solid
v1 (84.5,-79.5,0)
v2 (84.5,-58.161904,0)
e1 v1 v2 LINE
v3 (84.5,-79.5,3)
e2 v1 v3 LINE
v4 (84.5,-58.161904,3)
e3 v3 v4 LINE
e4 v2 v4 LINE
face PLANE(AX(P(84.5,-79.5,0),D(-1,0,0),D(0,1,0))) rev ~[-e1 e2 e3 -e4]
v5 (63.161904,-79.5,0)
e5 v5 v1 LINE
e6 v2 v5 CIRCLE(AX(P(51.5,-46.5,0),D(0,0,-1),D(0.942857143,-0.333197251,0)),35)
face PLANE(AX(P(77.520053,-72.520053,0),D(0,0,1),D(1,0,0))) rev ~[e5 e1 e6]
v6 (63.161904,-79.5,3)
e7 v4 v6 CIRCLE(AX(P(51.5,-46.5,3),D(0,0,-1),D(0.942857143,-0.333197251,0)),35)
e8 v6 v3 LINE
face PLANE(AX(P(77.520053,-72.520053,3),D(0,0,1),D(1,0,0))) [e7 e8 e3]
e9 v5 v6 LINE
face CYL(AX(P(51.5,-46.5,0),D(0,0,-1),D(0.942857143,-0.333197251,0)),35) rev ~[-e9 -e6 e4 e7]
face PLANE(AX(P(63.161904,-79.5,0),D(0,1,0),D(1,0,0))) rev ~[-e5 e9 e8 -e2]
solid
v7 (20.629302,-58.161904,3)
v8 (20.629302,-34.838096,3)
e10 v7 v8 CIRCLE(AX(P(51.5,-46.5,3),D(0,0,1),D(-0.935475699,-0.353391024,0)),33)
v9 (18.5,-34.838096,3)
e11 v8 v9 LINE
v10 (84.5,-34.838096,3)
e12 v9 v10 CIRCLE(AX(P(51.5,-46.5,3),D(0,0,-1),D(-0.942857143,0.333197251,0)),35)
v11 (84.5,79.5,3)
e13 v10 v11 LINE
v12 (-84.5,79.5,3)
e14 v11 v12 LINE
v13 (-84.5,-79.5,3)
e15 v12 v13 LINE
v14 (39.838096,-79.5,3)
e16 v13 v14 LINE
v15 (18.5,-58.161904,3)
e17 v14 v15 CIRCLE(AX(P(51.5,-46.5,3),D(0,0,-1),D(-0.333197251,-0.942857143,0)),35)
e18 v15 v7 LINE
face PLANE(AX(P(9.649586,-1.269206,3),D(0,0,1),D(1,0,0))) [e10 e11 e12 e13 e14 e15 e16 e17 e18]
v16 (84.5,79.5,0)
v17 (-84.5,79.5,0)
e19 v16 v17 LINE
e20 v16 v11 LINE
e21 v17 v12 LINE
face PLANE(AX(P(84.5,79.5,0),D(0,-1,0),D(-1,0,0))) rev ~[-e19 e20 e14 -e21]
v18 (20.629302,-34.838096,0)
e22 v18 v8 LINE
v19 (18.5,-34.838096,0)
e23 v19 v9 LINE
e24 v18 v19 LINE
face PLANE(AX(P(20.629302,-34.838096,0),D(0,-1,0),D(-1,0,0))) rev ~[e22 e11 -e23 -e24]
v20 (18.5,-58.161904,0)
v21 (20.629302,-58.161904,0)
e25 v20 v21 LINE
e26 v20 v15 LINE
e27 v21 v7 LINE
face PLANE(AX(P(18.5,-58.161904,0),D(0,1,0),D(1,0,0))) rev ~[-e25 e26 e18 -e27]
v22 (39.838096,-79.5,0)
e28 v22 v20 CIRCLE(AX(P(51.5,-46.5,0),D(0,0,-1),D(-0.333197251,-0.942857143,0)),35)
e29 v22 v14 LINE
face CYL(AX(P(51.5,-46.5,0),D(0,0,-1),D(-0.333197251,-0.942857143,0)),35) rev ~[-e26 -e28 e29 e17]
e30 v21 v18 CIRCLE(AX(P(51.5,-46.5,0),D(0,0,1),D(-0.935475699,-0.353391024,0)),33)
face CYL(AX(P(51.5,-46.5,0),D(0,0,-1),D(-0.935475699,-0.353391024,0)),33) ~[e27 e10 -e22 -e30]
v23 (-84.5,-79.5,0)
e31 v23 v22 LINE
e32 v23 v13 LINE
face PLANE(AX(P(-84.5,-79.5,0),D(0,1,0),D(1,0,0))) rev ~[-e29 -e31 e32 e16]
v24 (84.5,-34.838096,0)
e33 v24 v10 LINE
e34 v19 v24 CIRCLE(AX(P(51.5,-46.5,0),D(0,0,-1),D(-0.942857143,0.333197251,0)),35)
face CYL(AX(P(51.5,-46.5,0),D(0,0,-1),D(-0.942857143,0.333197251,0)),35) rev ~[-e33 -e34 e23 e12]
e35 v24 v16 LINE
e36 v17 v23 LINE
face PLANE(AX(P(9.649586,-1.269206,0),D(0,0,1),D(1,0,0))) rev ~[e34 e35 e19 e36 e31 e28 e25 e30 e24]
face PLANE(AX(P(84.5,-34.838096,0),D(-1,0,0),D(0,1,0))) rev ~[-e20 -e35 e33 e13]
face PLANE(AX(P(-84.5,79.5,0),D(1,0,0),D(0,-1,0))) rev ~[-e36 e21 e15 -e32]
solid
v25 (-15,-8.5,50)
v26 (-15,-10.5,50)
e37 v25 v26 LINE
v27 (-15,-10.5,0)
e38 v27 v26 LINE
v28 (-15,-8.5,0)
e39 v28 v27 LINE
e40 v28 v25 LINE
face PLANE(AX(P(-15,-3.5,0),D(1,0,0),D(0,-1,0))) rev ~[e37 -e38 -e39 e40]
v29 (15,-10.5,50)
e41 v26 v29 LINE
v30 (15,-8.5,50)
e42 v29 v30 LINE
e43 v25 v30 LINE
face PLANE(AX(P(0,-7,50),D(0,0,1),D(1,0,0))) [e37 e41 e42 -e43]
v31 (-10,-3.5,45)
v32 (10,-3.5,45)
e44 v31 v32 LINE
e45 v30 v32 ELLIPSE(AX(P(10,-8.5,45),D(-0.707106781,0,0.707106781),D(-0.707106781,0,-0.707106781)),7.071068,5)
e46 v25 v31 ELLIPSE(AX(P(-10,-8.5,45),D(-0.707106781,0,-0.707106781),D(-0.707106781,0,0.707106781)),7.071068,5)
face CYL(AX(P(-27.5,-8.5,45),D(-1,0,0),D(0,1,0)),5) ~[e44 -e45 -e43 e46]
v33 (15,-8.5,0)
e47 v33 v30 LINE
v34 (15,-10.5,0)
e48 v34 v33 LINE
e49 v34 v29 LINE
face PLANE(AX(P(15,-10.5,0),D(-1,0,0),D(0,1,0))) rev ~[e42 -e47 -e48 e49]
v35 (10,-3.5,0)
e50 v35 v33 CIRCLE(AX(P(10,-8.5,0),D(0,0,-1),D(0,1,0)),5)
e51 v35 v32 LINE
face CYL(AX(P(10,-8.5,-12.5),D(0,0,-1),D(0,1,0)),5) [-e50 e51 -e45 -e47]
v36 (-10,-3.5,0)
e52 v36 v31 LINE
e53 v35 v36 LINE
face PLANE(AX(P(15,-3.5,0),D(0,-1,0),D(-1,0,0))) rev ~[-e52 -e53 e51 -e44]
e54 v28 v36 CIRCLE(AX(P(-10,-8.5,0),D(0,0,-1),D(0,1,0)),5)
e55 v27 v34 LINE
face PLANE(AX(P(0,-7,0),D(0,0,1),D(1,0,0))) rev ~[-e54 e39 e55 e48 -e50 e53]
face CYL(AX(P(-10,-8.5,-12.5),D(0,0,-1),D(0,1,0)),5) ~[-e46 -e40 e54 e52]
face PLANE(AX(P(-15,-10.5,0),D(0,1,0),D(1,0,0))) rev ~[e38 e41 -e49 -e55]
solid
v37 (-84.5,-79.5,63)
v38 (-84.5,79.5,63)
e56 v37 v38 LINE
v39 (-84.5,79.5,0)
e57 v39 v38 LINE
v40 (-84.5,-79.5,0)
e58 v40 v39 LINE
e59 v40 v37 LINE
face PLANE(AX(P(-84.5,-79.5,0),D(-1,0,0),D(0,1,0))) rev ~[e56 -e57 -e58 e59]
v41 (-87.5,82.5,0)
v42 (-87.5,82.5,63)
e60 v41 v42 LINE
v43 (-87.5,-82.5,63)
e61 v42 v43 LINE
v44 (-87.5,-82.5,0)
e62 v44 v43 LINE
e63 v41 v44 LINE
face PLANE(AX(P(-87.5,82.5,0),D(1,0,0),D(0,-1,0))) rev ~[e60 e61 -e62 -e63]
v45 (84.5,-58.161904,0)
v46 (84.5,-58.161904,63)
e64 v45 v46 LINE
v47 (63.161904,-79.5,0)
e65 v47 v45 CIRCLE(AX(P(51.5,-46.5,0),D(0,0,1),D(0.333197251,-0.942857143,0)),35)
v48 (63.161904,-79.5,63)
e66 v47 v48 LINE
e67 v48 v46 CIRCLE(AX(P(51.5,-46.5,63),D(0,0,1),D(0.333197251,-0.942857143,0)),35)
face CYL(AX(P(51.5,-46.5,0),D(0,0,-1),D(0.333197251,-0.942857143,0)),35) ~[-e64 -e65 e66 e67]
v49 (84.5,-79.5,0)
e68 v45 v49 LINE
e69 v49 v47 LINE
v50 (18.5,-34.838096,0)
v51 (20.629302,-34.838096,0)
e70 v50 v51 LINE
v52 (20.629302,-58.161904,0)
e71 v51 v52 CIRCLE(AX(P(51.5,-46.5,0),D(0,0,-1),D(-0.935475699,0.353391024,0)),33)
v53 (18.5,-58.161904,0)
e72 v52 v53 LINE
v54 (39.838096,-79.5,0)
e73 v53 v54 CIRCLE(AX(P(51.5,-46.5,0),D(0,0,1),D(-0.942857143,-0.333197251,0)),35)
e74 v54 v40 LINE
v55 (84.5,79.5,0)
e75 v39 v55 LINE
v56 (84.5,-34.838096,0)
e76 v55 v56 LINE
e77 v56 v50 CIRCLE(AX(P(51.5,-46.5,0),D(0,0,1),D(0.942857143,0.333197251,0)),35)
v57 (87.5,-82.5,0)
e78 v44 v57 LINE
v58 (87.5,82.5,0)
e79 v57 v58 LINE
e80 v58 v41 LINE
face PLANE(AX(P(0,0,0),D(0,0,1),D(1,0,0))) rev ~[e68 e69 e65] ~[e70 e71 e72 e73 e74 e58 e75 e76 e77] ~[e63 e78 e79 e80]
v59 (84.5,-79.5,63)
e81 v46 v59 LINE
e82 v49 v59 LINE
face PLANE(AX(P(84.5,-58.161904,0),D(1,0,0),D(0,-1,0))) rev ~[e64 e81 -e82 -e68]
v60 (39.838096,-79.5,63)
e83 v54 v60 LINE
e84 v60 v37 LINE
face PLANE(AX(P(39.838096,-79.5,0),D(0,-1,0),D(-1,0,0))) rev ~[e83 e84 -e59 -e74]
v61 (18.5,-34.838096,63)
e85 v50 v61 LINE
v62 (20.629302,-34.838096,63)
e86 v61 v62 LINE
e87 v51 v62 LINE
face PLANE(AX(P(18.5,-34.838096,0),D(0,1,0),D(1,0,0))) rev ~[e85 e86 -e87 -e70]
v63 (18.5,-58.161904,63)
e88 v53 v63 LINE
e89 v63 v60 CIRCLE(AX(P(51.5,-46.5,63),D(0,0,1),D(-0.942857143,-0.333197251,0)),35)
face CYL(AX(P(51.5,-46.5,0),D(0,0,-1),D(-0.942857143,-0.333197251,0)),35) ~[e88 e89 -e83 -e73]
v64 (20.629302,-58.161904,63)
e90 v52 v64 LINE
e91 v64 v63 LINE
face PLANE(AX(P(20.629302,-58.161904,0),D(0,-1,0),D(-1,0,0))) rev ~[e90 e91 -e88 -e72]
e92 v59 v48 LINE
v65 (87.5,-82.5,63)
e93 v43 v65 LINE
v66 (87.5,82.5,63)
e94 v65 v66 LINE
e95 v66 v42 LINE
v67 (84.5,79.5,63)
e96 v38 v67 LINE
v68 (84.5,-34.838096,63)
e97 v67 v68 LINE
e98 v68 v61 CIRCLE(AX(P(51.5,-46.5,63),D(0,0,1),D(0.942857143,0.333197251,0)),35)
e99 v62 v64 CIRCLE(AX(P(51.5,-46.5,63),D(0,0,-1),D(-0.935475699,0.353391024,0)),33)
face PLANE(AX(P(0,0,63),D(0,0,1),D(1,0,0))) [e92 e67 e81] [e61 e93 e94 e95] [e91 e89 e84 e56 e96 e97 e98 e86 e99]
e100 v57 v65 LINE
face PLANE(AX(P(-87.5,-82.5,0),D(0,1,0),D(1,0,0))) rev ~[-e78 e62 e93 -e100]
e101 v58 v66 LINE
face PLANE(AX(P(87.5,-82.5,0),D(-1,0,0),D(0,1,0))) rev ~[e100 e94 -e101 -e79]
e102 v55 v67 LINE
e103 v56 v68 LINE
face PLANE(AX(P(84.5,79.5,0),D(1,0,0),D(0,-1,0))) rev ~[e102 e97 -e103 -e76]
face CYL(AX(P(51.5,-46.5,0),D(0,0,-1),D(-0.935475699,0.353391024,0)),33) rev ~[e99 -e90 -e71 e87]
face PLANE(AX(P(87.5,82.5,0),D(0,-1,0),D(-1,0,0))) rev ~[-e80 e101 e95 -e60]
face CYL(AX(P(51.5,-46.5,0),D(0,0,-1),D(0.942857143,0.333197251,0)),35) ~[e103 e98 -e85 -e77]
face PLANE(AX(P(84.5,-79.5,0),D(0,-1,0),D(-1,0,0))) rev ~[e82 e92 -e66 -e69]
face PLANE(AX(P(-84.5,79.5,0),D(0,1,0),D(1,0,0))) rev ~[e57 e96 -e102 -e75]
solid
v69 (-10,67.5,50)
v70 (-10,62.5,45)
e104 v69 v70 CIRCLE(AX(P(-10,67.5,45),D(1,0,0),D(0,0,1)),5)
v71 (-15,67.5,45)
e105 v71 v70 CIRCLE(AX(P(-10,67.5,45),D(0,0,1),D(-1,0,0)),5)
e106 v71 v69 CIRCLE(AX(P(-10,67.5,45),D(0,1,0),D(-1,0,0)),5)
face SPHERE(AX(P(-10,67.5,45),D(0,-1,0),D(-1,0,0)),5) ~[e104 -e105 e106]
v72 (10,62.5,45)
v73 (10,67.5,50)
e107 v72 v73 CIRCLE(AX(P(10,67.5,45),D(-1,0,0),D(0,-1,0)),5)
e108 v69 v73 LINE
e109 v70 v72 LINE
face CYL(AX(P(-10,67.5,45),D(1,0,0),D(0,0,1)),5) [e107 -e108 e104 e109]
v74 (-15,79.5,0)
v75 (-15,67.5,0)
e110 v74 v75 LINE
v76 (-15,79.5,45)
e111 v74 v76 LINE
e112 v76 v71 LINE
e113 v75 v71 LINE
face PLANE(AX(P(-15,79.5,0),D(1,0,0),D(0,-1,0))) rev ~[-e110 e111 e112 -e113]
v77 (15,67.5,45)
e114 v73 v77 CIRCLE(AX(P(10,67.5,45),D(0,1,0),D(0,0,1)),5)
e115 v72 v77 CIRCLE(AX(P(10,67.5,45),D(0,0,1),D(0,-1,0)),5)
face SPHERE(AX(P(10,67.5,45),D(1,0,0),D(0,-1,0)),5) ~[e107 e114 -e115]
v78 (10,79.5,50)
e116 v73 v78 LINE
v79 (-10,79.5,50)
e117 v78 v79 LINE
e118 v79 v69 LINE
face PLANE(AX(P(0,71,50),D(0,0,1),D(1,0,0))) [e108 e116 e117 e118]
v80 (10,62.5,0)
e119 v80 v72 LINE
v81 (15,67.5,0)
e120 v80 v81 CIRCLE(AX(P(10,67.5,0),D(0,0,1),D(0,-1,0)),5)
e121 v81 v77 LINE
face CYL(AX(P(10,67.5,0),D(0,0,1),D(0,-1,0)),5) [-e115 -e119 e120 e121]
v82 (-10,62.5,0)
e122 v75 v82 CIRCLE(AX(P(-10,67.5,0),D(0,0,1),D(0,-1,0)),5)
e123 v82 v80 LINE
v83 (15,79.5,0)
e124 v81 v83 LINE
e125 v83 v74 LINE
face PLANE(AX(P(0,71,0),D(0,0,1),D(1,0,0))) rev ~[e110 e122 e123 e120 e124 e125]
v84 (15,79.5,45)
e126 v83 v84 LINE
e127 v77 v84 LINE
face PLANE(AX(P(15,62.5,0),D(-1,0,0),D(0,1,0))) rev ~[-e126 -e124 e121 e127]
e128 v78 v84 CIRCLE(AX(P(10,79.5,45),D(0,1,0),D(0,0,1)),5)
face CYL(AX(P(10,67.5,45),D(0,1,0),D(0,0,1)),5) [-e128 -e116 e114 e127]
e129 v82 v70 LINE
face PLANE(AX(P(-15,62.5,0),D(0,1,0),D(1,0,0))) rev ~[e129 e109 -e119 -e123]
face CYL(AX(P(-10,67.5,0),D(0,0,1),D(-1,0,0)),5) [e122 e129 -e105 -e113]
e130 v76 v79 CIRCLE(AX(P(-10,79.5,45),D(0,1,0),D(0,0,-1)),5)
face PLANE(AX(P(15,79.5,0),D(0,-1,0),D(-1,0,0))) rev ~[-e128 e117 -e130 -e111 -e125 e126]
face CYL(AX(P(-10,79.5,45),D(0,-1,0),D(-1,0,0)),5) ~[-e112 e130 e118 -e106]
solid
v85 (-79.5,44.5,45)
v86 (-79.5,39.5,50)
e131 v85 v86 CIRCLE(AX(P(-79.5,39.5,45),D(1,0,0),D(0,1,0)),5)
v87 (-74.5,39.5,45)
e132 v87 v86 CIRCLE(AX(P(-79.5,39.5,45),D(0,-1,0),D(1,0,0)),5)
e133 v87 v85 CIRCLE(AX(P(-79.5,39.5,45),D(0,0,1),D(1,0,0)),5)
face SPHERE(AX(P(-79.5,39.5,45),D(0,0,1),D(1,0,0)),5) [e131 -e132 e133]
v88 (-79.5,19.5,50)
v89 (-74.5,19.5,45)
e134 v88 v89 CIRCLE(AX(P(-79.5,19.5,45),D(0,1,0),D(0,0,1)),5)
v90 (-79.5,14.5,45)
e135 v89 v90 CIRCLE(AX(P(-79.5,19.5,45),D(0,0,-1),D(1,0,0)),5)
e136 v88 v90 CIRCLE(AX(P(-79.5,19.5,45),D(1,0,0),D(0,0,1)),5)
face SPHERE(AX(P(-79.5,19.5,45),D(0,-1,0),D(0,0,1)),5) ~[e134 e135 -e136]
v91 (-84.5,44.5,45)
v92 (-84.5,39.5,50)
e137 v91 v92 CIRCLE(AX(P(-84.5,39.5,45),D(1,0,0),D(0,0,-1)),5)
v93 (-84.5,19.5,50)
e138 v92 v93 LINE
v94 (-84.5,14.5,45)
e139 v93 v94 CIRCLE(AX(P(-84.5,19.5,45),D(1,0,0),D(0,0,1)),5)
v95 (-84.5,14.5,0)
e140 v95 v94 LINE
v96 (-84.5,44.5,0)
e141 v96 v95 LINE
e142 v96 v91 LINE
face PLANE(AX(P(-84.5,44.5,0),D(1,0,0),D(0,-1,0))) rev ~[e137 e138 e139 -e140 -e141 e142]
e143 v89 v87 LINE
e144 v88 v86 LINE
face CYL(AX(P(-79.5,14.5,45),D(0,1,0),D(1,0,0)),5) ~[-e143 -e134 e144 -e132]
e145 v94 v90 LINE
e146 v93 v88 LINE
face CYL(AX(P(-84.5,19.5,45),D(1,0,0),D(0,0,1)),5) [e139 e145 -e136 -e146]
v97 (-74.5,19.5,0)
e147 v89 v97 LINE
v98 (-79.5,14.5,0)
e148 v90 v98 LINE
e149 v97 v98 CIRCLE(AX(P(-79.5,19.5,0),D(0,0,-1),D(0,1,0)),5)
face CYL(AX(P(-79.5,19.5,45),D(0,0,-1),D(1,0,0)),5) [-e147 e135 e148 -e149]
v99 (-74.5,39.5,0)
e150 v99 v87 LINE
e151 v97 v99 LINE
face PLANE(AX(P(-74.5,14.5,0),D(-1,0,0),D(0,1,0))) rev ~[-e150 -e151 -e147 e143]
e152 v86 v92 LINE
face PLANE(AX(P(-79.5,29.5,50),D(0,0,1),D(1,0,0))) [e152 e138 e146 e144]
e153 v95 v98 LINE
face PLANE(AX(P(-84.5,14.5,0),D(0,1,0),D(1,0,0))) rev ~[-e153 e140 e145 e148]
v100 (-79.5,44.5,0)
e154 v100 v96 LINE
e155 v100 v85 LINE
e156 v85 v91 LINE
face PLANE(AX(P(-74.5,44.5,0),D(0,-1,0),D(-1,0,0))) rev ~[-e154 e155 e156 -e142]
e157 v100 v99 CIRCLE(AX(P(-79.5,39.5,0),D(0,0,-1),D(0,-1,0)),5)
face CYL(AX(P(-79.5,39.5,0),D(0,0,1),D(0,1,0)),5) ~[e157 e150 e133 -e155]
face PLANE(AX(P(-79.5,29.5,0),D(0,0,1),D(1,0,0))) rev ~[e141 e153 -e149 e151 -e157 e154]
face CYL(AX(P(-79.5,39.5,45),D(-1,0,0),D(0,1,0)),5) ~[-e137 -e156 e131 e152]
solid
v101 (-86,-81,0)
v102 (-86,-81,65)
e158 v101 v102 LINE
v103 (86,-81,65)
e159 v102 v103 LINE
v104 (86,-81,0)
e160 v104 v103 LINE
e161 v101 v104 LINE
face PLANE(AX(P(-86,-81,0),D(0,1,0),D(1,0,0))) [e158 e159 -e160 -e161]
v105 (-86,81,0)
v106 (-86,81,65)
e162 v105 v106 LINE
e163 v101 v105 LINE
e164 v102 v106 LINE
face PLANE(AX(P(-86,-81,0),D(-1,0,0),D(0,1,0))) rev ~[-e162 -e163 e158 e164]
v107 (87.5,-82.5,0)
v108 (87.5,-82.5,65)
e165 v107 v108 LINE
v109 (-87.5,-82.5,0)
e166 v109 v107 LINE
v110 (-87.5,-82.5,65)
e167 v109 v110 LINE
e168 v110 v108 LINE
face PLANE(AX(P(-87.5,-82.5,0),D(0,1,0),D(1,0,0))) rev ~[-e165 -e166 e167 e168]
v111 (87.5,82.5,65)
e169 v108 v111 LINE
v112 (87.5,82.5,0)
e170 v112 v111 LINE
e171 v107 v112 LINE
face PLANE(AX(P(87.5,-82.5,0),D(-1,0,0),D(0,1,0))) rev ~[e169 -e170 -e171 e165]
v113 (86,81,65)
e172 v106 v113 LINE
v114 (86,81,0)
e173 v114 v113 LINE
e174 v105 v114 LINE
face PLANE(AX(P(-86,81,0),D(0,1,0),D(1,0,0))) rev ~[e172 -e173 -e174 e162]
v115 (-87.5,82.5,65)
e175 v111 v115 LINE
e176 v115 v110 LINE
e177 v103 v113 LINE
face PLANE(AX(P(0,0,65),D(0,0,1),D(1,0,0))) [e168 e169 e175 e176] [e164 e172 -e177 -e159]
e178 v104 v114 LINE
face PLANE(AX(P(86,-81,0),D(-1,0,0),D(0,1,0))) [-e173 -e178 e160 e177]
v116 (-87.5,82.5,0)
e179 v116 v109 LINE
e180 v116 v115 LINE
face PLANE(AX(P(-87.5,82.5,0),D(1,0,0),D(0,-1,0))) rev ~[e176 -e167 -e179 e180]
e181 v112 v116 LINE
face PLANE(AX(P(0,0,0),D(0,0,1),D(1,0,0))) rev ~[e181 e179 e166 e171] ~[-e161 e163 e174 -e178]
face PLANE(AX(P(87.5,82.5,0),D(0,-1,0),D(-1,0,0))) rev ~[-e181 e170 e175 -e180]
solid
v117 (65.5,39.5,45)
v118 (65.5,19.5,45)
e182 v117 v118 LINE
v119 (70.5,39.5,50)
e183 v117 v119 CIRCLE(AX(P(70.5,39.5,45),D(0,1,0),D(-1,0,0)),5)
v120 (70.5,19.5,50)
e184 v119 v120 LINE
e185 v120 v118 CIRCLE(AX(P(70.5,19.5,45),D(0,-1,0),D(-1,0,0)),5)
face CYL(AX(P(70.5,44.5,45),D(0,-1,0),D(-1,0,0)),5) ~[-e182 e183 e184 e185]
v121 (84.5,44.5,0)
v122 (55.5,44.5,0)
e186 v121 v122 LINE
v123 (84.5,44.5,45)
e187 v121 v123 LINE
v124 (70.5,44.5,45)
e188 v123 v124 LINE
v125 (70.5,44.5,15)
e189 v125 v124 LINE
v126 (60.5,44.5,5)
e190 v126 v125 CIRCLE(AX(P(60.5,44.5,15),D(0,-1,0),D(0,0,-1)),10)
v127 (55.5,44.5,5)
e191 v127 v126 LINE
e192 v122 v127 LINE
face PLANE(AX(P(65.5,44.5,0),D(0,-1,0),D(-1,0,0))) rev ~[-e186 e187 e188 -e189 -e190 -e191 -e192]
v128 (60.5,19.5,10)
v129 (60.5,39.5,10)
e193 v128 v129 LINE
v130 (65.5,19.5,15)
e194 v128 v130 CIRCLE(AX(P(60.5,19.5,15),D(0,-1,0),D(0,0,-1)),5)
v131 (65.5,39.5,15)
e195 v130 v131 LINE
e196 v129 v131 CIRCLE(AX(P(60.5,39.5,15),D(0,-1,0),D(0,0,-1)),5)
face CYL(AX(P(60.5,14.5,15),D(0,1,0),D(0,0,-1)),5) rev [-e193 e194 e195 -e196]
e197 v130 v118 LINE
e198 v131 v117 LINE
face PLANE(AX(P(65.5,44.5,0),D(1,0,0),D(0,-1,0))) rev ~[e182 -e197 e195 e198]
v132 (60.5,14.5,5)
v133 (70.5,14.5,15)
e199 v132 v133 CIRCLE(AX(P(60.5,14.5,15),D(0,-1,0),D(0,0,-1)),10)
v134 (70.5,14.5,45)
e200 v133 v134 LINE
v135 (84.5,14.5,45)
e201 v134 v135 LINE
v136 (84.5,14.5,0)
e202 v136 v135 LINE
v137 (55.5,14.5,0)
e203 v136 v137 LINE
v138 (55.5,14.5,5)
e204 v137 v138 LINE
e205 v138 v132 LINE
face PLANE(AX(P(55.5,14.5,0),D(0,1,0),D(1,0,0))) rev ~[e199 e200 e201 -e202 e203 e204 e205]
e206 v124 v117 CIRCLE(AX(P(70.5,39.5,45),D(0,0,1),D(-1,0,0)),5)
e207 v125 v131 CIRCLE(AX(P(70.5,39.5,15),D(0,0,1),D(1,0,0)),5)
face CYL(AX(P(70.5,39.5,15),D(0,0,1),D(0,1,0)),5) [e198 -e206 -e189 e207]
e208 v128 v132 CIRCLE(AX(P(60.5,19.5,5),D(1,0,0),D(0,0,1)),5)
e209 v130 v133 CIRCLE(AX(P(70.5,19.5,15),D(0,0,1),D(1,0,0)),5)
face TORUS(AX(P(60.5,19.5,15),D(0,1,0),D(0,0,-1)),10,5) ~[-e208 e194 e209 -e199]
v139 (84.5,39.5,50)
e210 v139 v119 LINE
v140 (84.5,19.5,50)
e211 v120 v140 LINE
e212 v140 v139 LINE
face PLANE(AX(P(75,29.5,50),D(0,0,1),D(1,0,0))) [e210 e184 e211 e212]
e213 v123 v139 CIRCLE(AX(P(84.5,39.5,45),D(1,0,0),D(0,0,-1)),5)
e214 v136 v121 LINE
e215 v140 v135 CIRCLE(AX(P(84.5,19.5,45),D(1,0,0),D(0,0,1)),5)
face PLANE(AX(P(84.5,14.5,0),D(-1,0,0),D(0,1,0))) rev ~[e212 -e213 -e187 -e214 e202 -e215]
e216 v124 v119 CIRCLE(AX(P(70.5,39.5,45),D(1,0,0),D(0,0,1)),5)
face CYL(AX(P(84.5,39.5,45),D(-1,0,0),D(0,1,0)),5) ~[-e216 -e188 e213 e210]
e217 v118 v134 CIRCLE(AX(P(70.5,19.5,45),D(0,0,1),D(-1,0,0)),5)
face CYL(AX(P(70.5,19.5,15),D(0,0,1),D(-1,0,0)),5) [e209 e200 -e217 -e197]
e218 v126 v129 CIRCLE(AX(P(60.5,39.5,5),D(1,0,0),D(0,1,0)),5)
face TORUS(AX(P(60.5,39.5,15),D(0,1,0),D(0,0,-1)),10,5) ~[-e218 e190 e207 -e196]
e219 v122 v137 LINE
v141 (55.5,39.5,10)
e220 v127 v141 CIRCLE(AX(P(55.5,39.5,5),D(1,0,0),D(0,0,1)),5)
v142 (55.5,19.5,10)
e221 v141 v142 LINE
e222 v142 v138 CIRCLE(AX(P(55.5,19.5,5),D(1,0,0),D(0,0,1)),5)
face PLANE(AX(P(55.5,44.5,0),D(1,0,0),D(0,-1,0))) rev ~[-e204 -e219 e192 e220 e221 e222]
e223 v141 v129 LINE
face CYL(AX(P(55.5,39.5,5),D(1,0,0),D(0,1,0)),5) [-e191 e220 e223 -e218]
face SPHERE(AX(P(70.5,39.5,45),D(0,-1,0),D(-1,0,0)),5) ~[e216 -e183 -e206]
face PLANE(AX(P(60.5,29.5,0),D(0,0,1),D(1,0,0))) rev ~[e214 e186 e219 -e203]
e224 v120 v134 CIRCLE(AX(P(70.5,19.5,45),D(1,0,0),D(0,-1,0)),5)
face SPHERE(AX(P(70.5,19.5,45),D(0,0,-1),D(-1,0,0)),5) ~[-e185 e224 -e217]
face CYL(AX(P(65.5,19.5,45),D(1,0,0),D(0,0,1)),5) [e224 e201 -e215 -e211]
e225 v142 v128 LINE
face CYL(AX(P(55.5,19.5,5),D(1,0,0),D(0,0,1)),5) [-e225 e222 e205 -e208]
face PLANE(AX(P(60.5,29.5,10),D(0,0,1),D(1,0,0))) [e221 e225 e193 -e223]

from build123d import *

# Parameters (mm, degrees)
F0_W          = 172
F0_H          = 162
F1_DEPTH      = 63
F2_DEPTH      = 3
F3_DEPTH      = 50
F4_DEPTH      = 10
F5_F1_R       = 5
F5_F2_R       = 5
F5_2_F1_R     = 5
F5_2_F2_R     = 5
F5_2_F3_R     = 5
F5_3_T1_DEPTH = 55
F5_3_T3_DEPTH = 75
F5_4_F1_R     = 5
F5_4_F2_R     = 5
F5_4_F3_R     = 5
F6_DEPTH      = 65


# Not quite as in the source:
# - a fillet or chamfer that OpenCascade refuses, or shapes differently, is made with other operations: its cross-section is extruded or revolved along the edge and cut away or added


with BuildPart() as f1:
    # F0 (on Top) → F1 (new body)
    with BuildSketch(Plane.XY):
        Polygon((-87.5, -82.5), (87.5, -82.5), (87.5, -81), (87.5, 82.5), (0, 82.5), (-87.5, 82.5), align=None)
        Rectangle(F0_W, F0_H, mode=Mode.SUBTRACT)
        Rectangle(F0_W, F0_H)
        with BuildLine():
            Line((84.5, -58.1619037897), (84.5, -79.5))
            Line((84.5, -79.5), (63.1619037897, -79.5))
            ThreePointArc((63.1619037897, -79.5), (76.2487373415, -71.2487373415), (84.5, -58.1619037897))
        make_face(mode=Mode.SUBTRACT)
        with BuildLine():
            Line((-84.5, 44.5), (-84.5, 79.5))
            Line((-84.5, 79.5), (-15, 79.5))
            Line((-15, 79.5), (15, 79.5))
            Line((15, 79.5), (84.5, 79.5))
            Line((84.5, 79.5), (84.5, 44.5))
            Line((84.5, 44.5), (84.5, 14.5))
            Line((84.5, 14.5), (84.5, -34.8380962103))
            ThreePointArc((84.5, -34.8380962103), (51.5, -11.5), (18.5, -34.8380962103))
            Line((18.5, -34.8380962103), (20.6293019191, -34.8380962103))
            ThreePointArc((20.6293019191, -34.8380962103), (84.5, -46.5), (20.6293019191, -58.1619037897))
            Line((20.6293019191, -58.1619037897), (18.5, -58.1619037897))
            ThreePointArc((18.5, -58.1619037897), (26.7512626585, -71.2487373415), (39.8380962103, -79.5))
            Line((39.8380962103, -79.5), (-84.5, -79.5))
            Line((-84.5, -79.5), (-84.5, 14.5))
            Line((-84.5, 14.5), (-84.5, 44.5))
        make_face(mode=Mode.SUBTRACT)
    extrude(amount=F1_DEPTH)


with BuildPart() as f2:
    # F0 (on Top) → F2 (new body)
    with BuildSketch(Plane.XY):
        with BuildLine():
            Line((-15, 79.5), (-84.5, 79.5))
            Line((-84.5, 79.5), (-84.5, 44.5))
            Line((-84.5, 44.5), (-74.5, 44.5))
            Line((-74.5, 44.5), (-74.5, 29.5))
            Line((-74.5, 29.5), (-74.5, 14.5))
            Line((-74.5, 14.5), (-84.5, 14.5))
            Line((-84.5, 14.5), (-84.5, -79.5))
            Line((-84.5, -79.5), (39.8380962103, -79.5))
            ThreePointArc((39.8380962103, -79.5), (26.7512626585, -71.2487373415), (18.5, -58.1619037897))
            Line((18.5, -58.1619037897), (20.6293019191, -58.1619037897))
            ThreePointArc((20.6293019191, -58.1619037897), (84.5, -46.5), (20.6293019191, -34.8380962103))
            Line((20.6293019191, -34.8380962103), (18.5, -34.8380962103))
            ThreePointArc((18.5, -34.8380962103), (51.5, -11.5), (84.5, -34.8380962103))
            Line((84.5, -34.8380962103), (84.5, 14.5))
            Line((84.5, 14.5), (65.5, 14.5))
            Line((65.5, 14.5), (55.5, 14.5))
            Line((55.5, 14.5), (55.5, 44.5))
            Line((55.5, 44.5), (65.5, 44.5))
            Line((65.5, 44.5), (84.5, 44.5))
            Line((84.5, 44.5), (84.5, 79.5))
            Line((84.5, 79.5), (15, 79.5))
            Line((15, 79.5), (15, 62.5))
            Line((15, 62.5), (0, 62.5))
            Line((0, 62.5), (-15, 62.5))
            Line((-15, 62.5), (-15, 79.5))
        make_face()
        Polygon((-15, -3.5), (0, -3.5), (15, -3.5), (15, -10.5), (-15, -10.5), align=None, mode=Mode.SUBTRACT)
        Polygon((-74.5, 44.5), (-84.5, 44.5), (-84.5, 14.5), (-74.5, 14.5), (-74.5, 29.5), align=None)
        Polygon((15, 79.5), (-15, 79.5), (-15, 62.5), (0, 62.5), (15, 62.5), align=None)
        Polygon((65.5, 29.5), (65.5, 44.5), (55.5, 44.5), (55.5, 14.5), (65.5, 14.5), align=None)
        Polygon((84.5, 14.5), (84.5, 44.5), (65.5, 44.5), (65.5, 29.5), (65.5, 14.5), align=None)
        Polygon((15, -3.5), (0, -3.5), (-15, -3.5), (-15, -10.5), (15, -10.5), align=None)
    extrude(amount=F2_DEPTH)


with BuildPart() as f2b:
    # F0 (on Top) → F2, piece 2 (new body)
    with BuildSketch(Plane.XY):
        with BuildLine():
            Line((63.1619037897, -79.5), (84.5, -79.5))
            Line((84.5, -79.5), (84.5, -58.1619037897))
            ThreePointArc((84.5, -58.1619037897), (76.2487373415, -71.2487373415), (63.1619037897, -79.5))
        make_face()
    extrude(amount=F2_DEPTH)


with BuildPart() as f3:
    # F0 (on Top) → F3 (new body)
    with BuildSketch(Plane.XY):
        Polygon((84.5, 14.5), (84.5, 44.5), (65.5, 44.5), (65.5, 29.5), (65.5, 14.5), align=None)
    extrude(amount=F3_DEPTH)

    # F0 (on Top) → F4 (join)
    with BuildSketch(Plane.XY):
        Polygon((65.5, 29.5), (65.5, 44.5), (55.5, 44.5), (55.5, 14.5), (65.5, 14.5), align=None)
    extrude(amount=F4_DEPTH)

    # F5: fillet of radius 5 on 6 edges, made by hand

    # F5_f1
    f5_f1_edges = [f3.edges().sort_by_distance(p)[0] for p in [
        (65.5, 29.5, 10),
    ]]
    fillet(f5_f1_edges, radius=F5_F1_R)

    # F5_f2
    f5_f2_edges = [f3.edges().sort_by_distance(p)[0] for p in [
        (65.5, 14.5, 32.5),
        (65.5, 29.5, 50),
        (65.5, 44.5, 32.5),
        (75, 14.5, 50),
        (75, 44.5, 50),
        (64.0355339059, 44.5, 11.4644660941),
        (64.0355339059, 14.5, 11.4644660941),
    ]]
    fillet(f5_f2_edges, radius=F5_F2_R)


with BuildPart() as f3b:
    # F0 (on Top) → F3, piece 2 (new body)
    with BuildSketch(Plane.XY):
        Polygon((15, 79.5), (-15, 79.5), (-15, 62.5), (0, 62.5), (15, 62.5), align=None)
    extrude(amount=F3_DEPTH)

    # F5#2: fillet of radius 5 on 5 edges, made by hand

    # F5_2_f1
    f5_2_f1_edges = [f3b.edges().sort_by_distance(p)[0] for p in [
        (-15, 71, 50),
    ]]
    fillet(f5_2_f1_edges, radius=F5_2_F1_R)

    # F5_2_f2
    f5_2_f2_edges = [f3b.edges().sort_by_distance(p)[0] for p in [
        (2.5, 62.5, 50),
    ]]
    fillet(f5_2_f2_edges, radius=F5_2_F2_R)

    # F5_2_f3
    f5_2_f3_edges = [f3b.edges().sort_by_distance(p)[0] for p in [
        (15, 73.5, 50),
    ]]
    fillet(f5_2_f3_edges, radius=F5_2_F3_R)


with BuildPart() as f3c:
    # F0 (on Top) → F3, piece 3 (new body)
    with BuildSketch(Plane.XY):
        Polygon((15, -3.5), (0, -3.5), (-15, -3.5), (-15, -10.5), (15, -10.5), align=None)
    extrude(amount=F3_DEPTH)

    # F5#3: fillet of radius 5 on 3 edges, made by hand

    # F5_3_s2 → F5_3_t1 (cut)
    with BuildSketch(Plane.YZ.offset(-27.5)):
        with BuildLine():
            ThreePointArc((-3.5, 45), (-4.9644660941, 48.5355339059), (-8.5, 50))
            Line((-8.5, 50), (-3.5, 50))
            Line((-3.5, 50), (-3.5, 45))
        make_face()
    extrude(amount=F5_3_T1_DEPTH, mode=Mode.SUBTRACT)

    # F5_3_s4 → F5_3_t3 (cut)
    with BuildSketch(Plane.XY.offset(-12.5)):
        with BuildLine():
            ThreePointArc((-10, -3.5), (-13.5355339059, -4.9644660941), (-15, -8.5))
            Line((-15, -8.5), (-15, -3.5))
            Line((-15, -3.5), (-10, -3.5))
        make_face()
        with BuildLine():
            ThreePointArc((10, -3.5), (13.5355339059, -4.9644660941), (15, -8.5))
            Line((15, -8.5), (15, -3.5))
            Line((15, -3.5), (10, -3.5))
        make_face()
    extrude(amount=F5_3_T3_DEPTH, mode=Mode.SUBTRACT)


with BuildPart() as f3d:
    # F0 (on Top) → F3, piece 4 (new body)
    with BuildSketch(Plane.XY):
        Polygon((-74.5, 44.5), (-84.5, 44.5), (-84.5, 14.5), (-74.5, 14.5), (-74.5, 29.5), align=None)
    extrude(amount=F3_DEPTH)

    # F5#4: fillet of radius 5 on 5 edges, made by hand

    # F5_4_f1
    f5_4_f1_edges = [f3d.edges().sort_by_distance(p)[0] for p in [
        (-74.5, 44.5, 25),
    ]]
    fillet(f5_4_f1_edges, radius=F5_4_F1_R)

    # F5_4_f2
    f5_4_f2_edges = [f3d.edges().sort_by_distance(p)[0] for p in [
        (-82, 44.5, 50),
    ]]
    fillet(f5_4_f2_edges, radius=F5_4_F2_R)

    # F5_4_f3
    f5_4_f3_edges = [f3d.edges().sort_by_distance(p)[0] for p in [
        (-82, 14.5, 50),
    ]]
    fillet(f5_4_f3_edges, radius=F5_4_F3_R)


with BuildPart() as f6:
    # F0 (on Top) → F6 (new body)
    with BuildSketch(Plane.XY):
        Polygon((-87.5, -82.5), (87.5, -82.5), (87.5, -81), (87.5, 82.5), (0, 82.5), (-87.5, 82.5), align=None)
        Rectangle(F0_W, F0_H, mode=Mode.SUBTRACT)
    extrude(amount=F6_DEPTH)


solid = Compound([f1.part, f2.part, f2b.part, f3.part, f3b.part, f3c.part, f3d.part, f6.part])
